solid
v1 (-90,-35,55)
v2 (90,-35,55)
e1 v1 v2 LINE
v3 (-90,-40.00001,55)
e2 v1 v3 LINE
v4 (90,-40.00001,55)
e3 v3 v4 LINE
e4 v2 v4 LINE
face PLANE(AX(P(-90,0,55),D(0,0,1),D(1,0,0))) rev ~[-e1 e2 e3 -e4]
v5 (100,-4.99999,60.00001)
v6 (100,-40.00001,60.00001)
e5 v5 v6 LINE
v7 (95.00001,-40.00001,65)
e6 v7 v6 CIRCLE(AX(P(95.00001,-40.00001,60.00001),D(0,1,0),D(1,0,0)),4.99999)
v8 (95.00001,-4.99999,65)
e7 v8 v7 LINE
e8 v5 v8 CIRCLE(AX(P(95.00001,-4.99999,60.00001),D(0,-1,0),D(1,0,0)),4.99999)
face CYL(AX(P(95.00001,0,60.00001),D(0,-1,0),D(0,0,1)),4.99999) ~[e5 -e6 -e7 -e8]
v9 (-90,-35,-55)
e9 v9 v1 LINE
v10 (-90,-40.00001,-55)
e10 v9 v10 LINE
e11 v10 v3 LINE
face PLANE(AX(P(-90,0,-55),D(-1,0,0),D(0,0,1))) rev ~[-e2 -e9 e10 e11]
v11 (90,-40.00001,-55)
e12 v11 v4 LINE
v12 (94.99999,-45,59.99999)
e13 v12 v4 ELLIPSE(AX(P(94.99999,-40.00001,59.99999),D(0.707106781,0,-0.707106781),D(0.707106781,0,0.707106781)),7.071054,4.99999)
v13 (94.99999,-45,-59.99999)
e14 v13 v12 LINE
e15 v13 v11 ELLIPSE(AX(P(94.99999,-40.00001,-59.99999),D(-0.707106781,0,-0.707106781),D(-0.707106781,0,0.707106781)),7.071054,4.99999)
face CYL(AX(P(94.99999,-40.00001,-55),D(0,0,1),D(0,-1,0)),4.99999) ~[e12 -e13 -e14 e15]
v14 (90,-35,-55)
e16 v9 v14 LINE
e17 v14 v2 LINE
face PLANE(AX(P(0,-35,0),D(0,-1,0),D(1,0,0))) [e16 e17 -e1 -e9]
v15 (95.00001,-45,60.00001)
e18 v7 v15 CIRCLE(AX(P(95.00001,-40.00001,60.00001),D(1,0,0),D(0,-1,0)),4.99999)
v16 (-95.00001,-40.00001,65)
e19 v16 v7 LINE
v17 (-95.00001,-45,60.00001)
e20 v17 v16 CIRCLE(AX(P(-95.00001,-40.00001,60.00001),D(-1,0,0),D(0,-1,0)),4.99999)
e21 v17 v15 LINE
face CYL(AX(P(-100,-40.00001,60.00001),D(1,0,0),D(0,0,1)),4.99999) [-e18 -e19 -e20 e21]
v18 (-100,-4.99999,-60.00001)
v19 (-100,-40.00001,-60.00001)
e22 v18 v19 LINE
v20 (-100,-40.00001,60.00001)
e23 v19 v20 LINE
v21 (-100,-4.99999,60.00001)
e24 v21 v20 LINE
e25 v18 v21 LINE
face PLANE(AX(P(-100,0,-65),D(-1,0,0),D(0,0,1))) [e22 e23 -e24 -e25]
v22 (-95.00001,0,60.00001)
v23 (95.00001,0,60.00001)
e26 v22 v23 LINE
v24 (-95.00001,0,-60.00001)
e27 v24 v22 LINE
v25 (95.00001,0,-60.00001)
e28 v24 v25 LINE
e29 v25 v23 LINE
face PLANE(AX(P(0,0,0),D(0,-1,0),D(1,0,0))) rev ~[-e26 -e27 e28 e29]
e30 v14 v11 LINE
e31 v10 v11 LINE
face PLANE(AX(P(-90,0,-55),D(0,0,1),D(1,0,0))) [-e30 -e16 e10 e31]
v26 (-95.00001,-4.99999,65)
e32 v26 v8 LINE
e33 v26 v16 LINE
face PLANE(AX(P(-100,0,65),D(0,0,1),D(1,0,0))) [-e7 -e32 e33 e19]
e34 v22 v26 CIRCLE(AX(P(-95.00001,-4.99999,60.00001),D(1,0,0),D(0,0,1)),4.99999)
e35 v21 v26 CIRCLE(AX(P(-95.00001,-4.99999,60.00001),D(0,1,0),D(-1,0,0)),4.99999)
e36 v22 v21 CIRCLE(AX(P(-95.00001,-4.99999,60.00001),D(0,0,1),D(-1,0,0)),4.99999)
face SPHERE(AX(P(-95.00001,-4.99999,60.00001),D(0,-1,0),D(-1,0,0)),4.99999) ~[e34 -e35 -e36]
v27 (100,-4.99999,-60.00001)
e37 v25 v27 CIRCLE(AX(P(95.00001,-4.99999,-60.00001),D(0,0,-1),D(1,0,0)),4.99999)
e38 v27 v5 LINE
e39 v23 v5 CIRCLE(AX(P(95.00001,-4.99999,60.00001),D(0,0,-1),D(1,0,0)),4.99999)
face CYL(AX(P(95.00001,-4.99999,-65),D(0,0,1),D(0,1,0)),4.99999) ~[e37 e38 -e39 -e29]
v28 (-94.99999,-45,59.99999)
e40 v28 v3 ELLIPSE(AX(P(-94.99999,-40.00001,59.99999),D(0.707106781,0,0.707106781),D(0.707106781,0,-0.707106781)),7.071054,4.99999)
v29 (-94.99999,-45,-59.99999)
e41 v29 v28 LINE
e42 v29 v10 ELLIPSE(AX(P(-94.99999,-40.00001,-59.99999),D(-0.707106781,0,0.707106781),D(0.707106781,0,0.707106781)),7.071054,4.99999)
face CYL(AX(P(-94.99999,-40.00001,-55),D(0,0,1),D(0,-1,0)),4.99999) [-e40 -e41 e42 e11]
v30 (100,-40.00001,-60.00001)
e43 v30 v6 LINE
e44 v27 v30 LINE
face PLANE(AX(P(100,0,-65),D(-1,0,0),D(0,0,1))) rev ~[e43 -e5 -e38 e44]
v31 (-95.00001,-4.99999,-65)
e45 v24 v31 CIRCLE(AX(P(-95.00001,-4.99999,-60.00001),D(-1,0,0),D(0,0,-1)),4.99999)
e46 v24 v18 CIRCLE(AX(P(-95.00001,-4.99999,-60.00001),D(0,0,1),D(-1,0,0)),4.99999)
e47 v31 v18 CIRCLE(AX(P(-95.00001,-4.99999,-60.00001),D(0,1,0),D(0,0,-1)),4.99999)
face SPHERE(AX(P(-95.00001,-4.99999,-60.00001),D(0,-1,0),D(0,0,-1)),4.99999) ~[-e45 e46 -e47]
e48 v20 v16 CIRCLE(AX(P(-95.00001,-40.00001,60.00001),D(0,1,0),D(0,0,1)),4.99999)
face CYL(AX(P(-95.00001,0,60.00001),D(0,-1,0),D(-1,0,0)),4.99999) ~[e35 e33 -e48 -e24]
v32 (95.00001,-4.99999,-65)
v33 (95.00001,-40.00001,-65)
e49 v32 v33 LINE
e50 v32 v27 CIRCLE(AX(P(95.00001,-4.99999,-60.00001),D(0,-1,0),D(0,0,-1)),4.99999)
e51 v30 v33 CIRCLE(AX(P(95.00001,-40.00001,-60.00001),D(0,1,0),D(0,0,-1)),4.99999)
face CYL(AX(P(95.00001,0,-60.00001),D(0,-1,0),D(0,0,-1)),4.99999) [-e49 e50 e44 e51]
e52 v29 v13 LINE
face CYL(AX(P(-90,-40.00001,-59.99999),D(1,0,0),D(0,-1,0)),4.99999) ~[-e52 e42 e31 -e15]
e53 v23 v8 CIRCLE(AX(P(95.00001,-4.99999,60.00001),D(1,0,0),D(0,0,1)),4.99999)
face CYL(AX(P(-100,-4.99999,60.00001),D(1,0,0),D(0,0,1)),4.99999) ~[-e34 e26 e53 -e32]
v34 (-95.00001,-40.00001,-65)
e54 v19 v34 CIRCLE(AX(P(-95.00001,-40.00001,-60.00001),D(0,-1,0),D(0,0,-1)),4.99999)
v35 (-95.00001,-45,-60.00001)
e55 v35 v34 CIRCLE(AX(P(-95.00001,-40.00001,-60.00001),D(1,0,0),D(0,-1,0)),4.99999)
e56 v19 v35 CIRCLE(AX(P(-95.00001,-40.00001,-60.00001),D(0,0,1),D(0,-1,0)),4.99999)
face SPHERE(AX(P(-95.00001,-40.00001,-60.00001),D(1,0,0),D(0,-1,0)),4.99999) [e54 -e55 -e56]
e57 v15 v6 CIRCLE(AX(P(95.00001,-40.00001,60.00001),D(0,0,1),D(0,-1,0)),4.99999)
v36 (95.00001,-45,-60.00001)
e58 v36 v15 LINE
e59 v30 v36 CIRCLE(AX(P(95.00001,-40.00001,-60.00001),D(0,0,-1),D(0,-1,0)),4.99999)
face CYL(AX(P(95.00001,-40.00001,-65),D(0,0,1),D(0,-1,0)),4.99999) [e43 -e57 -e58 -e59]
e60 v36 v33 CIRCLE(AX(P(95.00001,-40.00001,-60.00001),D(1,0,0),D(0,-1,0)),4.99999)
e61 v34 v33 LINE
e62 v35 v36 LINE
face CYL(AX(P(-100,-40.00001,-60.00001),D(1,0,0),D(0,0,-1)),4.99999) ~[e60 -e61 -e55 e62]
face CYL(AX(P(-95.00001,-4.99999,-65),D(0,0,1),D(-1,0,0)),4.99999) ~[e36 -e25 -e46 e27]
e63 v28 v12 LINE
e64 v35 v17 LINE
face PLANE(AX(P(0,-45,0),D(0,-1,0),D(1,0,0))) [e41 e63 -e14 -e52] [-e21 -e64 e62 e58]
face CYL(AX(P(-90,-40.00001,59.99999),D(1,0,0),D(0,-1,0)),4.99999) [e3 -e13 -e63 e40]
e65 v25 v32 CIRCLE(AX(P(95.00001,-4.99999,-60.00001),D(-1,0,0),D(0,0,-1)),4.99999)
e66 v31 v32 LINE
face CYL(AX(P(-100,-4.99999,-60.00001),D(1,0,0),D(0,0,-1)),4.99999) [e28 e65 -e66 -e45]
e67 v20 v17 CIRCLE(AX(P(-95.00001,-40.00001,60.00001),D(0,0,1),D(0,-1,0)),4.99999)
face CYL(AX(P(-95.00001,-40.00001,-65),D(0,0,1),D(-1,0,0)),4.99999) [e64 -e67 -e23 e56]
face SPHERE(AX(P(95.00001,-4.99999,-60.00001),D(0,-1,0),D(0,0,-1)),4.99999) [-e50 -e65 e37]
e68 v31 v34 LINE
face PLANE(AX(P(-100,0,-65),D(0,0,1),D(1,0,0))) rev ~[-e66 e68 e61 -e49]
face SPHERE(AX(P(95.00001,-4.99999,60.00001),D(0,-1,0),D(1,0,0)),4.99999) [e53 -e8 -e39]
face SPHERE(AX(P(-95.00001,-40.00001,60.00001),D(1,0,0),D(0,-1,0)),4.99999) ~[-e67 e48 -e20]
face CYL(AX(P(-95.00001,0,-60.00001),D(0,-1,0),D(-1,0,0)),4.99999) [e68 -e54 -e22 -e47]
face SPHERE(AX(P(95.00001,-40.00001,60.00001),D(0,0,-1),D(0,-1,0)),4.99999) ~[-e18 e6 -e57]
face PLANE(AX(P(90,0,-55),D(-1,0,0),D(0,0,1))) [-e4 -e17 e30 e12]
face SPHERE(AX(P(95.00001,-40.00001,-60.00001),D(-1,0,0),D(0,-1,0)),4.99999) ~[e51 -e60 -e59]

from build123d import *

# Parameters (mm, degrees)
F0_W     = 180
F0_H     = 110
F1_DEPTH = 35
F0_W_2   = 200
F0_H_2   = 130
F2_DEPTH = 45
F3_R     = 4.99999


# Not quite as in the source:
# - a fillet or chamfer is up to 0.001 mm smaller than in the source, because OpenCascade refuses the exact size


with BuildPart() as f1:
    # F0 (on Front) → F1 (new body)
    with BuildSketch(Plane.XZ):
        Rectangle(F0_W, F0_H)
    extrude(amount=F1_DEPTH)

    # F0 (on Front) → F2 (join)
    with BuildSketch(Plane.XZ):
        Rectangle(F0_W_2, F0_H_2)
        Rectangle(F0_W, F0_H, mode=Mode.SUBTRACT)
    extrude(amount=F2_DEPTH)

    # F3 (radius 5 in the source; OpenCascade refuses exactly that, so slightly less here)
    f3_edges = [f1.edges().sort_by_distance(p)[0] for p in [
        (0, -45, -65),
        (100, -45, 0),
        (0, -45, 65),
        (-100, -45, 0),
        (0, -45, 55),
        (90, -45, 0),
        (0, -45, -55),
        (-90, -45, 0),
        (-100, -22.5, -65),
        (100, -22.5, -65),
        (0, 0, -65),
        (-100, -22.5, 65),
        (-100, 0, 0),
        (100, -22.5, 65),
        (100, 0, 0),
        (0, 0, 65),
    ]]
    fillet(f3_edges, radius=F3_R)


solid = f1.part
